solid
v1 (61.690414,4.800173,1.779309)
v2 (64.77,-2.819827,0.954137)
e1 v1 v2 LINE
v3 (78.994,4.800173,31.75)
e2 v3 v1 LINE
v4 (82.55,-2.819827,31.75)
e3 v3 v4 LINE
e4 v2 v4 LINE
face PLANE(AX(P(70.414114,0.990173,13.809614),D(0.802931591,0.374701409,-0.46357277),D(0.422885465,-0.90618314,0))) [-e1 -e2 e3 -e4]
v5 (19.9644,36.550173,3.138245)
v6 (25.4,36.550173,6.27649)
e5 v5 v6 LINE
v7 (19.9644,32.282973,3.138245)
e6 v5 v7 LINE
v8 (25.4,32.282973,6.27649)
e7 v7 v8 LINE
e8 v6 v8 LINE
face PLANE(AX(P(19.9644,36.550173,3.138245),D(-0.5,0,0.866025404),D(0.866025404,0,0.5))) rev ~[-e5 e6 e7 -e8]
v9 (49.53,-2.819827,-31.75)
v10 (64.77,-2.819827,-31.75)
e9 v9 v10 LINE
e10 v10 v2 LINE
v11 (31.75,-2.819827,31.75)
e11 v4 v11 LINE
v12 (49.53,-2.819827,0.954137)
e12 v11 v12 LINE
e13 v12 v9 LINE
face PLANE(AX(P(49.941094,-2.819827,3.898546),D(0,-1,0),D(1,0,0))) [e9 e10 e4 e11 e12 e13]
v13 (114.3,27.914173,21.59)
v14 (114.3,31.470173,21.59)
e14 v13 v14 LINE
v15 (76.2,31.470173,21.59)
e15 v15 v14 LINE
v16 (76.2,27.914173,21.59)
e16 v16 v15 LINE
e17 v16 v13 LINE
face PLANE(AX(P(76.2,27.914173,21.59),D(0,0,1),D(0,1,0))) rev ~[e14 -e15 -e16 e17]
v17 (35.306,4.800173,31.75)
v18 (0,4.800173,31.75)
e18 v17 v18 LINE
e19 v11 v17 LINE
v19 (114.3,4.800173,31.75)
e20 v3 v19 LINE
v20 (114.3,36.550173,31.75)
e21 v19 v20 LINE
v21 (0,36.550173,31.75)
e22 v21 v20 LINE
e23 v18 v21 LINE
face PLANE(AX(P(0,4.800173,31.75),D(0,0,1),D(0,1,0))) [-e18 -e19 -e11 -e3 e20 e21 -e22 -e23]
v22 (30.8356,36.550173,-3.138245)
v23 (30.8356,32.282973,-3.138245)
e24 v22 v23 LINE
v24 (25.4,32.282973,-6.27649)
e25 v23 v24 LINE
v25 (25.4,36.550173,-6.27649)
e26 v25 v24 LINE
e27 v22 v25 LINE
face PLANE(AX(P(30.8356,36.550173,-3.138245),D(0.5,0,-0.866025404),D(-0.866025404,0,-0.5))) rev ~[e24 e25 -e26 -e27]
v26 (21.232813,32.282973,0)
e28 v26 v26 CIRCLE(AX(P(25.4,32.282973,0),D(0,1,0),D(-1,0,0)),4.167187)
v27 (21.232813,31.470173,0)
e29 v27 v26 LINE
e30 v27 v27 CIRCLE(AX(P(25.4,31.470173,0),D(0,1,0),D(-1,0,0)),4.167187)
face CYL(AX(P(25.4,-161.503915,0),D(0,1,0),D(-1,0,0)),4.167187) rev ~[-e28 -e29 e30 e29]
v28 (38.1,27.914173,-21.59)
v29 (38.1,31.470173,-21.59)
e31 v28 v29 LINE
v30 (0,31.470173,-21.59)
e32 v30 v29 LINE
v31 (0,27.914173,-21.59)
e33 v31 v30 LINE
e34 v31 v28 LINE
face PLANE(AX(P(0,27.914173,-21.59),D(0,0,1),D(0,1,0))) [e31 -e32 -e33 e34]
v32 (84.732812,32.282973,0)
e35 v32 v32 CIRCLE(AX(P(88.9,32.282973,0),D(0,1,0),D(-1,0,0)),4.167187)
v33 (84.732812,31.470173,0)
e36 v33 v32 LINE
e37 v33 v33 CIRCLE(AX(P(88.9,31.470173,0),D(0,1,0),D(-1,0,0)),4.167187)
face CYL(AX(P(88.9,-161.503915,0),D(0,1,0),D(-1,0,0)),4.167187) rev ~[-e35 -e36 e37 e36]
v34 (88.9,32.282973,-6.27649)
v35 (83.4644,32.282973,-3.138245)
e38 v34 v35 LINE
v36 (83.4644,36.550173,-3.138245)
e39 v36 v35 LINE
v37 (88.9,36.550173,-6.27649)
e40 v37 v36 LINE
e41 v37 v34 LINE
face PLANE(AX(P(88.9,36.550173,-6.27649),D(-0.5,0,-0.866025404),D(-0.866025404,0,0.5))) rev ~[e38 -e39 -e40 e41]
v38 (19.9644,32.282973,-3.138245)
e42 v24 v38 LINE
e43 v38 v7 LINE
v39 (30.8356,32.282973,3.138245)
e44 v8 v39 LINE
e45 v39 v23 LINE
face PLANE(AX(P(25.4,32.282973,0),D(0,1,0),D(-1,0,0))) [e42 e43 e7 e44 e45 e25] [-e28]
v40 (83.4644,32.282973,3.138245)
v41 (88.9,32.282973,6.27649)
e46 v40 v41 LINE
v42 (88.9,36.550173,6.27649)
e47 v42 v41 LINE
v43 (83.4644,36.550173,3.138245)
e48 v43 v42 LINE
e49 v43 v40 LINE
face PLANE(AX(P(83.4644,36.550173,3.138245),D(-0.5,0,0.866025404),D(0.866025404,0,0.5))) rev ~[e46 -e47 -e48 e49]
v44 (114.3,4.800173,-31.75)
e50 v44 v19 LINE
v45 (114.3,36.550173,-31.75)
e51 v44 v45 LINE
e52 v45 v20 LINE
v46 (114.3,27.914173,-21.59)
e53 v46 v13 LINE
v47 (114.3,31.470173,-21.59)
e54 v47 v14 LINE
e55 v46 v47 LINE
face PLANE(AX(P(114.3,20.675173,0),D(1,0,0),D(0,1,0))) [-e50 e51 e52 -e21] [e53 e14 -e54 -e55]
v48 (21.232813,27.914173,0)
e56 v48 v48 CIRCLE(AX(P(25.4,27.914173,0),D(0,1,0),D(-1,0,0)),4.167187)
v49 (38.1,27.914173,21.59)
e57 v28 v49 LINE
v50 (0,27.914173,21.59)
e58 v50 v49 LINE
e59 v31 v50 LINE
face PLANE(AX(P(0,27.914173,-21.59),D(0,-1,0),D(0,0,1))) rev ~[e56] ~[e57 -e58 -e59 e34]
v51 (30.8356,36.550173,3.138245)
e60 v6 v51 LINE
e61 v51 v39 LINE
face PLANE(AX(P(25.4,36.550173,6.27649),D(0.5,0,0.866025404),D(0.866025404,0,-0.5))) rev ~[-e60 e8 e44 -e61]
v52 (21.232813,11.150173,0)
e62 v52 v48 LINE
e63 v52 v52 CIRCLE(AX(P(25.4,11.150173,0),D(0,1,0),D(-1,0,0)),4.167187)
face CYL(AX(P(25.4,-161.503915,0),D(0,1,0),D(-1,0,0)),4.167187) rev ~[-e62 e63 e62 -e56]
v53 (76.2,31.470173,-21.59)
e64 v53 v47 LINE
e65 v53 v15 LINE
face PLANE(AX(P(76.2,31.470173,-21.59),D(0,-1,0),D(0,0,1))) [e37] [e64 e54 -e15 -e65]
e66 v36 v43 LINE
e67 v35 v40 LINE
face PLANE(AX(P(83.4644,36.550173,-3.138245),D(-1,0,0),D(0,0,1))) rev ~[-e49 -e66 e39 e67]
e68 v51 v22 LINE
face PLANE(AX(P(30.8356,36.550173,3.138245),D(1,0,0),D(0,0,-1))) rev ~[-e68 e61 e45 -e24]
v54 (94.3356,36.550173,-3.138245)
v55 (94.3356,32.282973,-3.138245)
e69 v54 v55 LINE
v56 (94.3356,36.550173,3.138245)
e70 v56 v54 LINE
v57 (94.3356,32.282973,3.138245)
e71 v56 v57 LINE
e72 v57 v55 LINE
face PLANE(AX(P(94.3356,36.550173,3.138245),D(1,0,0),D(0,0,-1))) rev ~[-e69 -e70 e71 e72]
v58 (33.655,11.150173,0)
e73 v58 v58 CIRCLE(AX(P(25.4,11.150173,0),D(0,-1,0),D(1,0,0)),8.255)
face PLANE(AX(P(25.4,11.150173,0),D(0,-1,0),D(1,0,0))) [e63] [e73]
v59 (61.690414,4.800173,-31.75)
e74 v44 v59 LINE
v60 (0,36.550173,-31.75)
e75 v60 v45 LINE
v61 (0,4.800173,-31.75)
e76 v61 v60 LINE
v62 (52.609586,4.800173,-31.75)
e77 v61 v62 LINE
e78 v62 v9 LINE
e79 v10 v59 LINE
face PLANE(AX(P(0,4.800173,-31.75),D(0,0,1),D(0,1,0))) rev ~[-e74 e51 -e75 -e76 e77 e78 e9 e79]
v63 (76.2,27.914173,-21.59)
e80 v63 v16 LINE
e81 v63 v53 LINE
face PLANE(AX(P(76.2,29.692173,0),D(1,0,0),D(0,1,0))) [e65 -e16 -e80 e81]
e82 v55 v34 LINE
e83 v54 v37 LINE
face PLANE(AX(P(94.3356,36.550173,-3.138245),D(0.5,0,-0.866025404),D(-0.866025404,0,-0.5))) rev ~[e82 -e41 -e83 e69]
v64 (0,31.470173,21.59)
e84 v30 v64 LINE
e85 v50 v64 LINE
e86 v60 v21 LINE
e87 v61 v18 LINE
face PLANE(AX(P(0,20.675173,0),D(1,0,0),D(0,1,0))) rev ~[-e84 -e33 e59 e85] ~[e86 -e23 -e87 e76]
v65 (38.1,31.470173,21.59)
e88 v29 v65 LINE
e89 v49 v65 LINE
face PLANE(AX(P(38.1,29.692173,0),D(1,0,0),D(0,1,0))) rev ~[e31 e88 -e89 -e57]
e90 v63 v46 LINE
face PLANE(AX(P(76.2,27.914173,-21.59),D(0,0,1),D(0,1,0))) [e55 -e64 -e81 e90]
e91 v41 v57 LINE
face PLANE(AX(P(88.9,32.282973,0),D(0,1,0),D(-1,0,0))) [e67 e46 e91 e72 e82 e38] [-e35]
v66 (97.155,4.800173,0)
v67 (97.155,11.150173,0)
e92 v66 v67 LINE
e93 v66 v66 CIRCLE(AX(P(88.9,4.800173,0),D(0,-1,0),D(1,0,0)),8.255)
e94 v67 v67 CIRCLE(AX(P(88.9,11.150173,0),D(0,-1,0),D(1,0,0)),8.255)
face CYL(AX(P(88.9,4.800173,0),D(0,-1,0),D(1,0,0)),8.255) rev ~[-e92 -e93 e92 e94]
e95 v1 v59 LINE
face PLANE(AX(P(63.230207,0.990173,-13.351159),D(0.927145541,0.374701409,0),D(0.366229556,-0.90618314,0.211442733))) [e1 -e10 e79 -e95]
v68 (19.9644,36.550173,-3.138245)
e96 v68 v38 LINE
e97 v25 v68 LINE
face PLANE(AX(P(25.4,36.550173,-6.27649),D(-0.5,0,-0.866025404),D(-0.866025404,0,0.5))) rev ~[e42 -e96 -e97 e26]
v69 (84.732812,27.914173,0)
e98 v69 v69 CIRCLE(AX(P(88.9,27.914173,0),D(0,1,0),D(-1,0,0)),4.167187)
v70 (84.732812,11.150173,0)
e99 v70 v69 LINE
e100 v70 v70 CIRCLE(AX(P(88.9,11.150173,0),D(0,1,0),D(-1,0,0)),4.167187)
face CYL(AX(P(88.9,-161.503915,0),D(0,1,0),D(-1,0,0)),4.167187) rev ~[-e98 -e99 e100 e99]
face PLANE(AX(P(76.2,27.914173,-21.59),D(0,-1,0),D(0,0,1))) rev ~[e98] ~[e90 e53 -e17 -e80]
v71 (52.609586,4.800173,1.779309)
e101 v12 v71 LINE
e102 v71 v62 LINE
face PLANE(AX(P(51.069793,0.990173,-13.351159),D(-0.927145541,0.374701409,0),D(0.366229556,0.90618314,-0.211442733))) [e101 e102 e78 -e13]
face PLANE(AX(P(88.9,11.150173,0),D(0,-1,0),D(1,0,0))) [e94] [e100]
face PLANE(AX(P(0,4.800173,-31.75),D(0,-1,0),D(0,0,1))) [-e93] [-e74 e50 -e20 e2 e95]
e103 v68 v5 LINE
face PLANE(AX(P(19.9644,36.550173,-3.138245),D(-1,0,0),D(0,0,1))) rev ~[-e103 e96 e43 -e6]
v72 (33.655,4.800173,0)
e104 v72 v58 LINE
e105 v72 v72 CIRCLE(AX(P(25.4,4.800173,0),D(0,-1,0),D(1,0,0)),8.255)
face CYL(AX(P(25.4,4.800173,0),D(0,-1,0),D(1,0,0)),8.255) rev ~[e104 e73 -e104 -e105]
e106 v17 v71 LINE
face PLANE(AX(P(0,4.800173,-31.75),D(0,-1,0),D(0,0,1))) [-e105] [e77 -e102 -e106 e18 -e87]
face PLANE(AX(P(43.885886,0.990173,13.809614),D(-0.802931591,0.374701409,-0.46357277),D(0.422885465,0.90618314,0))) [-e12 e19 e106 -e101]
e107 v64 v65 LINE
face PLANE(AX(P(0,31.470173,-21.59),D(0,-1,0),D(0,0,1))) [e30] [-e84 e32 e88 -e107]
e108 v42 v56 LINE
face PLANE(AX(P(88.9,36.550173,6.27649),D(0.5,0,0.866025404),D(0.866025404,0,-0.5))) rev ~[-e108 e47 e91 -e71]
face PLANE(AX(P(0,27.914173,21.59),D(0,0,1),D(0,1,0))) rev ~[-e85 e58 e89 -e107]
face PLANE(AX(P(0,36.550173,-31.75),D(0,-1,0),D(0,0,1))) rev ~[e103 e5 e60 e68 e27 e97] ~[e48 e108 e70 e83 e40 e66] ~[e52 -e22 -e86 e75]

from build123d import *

# Parameters (mm, degrees)
F0_W      = 31.75
F0_H      = 63.5
F1_DEPTH  = 114.3
F2_DEPTH  = 114.3
F4_D      = 8.334375
F4_2_D    = 8.334375
F7_DEPTH  = 7.62
F8_W      = 3.556
F8_H      = 43.18
F9_DEPTH  = 38.1
F10_START = 76.2
F10_DEPTH = 38.1
F14_R     = 8.255
F14_R_2   = 4.1671875
F15_R     = 8.255
F15_R_2   = 4.1671875
F16_DEPTH = 6.35
F17_R     = 4.1671875
F18_DEPTH = 4.2672


# Not quite as in the source:
# - a length typed as a fraction of an inch, garbled in the dataset ("3 / 203.2 mm" for 3/8 in), is restored


with BuildPart() as f1:
    # F0 (on Right) → F1 (new body)
    with BuildSketch(Plane.YZ):
        with Locations((20.6751725854, 0)):
            Rectangle(F0_W, F0_H)
    extrude(amount=F1_DEPTH)

    # F4 (through all)
    with Locations(Plane.XZ.offset(26.9498274146)):
        with Locations((25.4, 0), (88.9, 0)):
            Hole(F4_D / 2)

    # F6 (on face) → F7 (join)
    with BuildSketch(Plane.XZ.offset(-4.8001725854)):
        Polygon((57.15, -31.75), (57.15, 31.75), (31.75, 31.75), (49.53, 0.9541366414), (49.53, -31.75), align=None)
        Polygon((82.55, 31.75), (57.15, 31.75), (57.15, -31.75), (64.77, -31.75), (64.77, 0.9541366414), align=None)
    extrude(amount=F7_DEPTH)

    # F8 (on face) → F9 (cut)
    with BuildSketch(Plane.YZ):
        with Locations((29.6921725854, 0)):
            Rectangle(F8_W, F8_H)
    extrude(amount=F9_DEPTH, mode=Mode.SUBTRACT)

    # F8 (on face) → F10 (cut)
    with BuildSketch(Plane.YZ.offset(F10_START)):
        with Locations((29.6921725854, 0)):
            Rectangle(F8_W, F8_H)
    extrude(amount=F10_DEPTH, mode=Mode.SUBTRACT)

    # F12: sweep along a path in F12_path
    with BuildLine(Plane(origin=(31.75, -2.8198274146, 31.75), x_dir=(0, 0, 1), z_dir=(0, -1, 0))) as f12_path:
        Line((0, 0), (-30.7958633586, -17.78))
        Line((-30.7958633586, -17.78), (-63.5, -17.78))
    # F11 (on face) → F12 (sweep, cut)
    with BuildSketch(Plane.XY.offset(31.75)):
        Polygon((35.306, 4.8001725854), (31.75, 4.8001725854), (31.75, -2.8198274146), align=None)
    sweep(path=f12_path.line, transition=Transition.RIGHT, mode=Mode.SUBTRACT)

    # F13: sweep along a path in F13_path
    with BuildLine(Plane(origin=(82.55, -2.8198274146, 31.75), x_dir=(0, 0, -1), z_dir=(0, 1, 0))) as f13_path:
        Line((0, 0), (30.7958633586, 17.78))
        Line((30.7958633586, 17.78), (63.5, 17.78))
    # F11 (on face) → F13 (sweep, cut)
    with BuildSketch(Plane.XY.offset(31.75)):
        Polygon((78.994, 4.8001725854), (82.55, -2.8198274146), (82.55, 4.8001725854), align=None)
    sweep(path=f13_path.line, transition=Transition.RIGHT, mode=Mode.SUBTRACT)

    # F14 (on face) + F15 (on face) → F16 (cut)
    with BuildSketch(Plane.XZ.offset(-4.8001725854)):
        with Locations((25.4, 0)):
            Circle(F14_R)
        with Locations((25.4, 0)):
            Circle(F14_R_2, mode=Mode.SUBTRACT)
    with BuildSketch(Plane.XZ.offset(-4.8001725854)):
        with Locations((88.9, 0)):
            Circle(F15_R)
        with Locations((88.9, 0)):
            Circle(F15_R_2, mode=Mode.SUBTRACT)
    extrude(amount=-F16_DEPTH, mode=Mode.SUBTRACT)

    # F17 (on face) → F18 (cut)
    with BuildSketch(Plane(origin=(0, 36.5501725854, 0), x_dir=(-1, 0, 0), z_dir=(0, 1, 0))):
        Polygon((-83.4644, -3.1382451232), (-83.4644, 3.1382451232), (-88.9, 6.2764902464), (-94.3356, 3.1382451232), (-94.3356, -3.1382451232), (-88.9, -6.2764902464), align=None)
        with Locations((-88.9, 0)):
            Circle(F17_R, mode=Mode.SUBTRACT)
        Polygon((-30.8356, 3.1382451232), (-30.8356, -3.1382451232), (-25.4, -6.2764902464), (-19.9644, -3.1382451232), (-19.9644, 3.1382451232), (-25.4, 6.2764902464), align=None)
        with Locations((-25.4, 0)):
            Circle(F17_R, mode=Mode.SUBTRACT)
    extrude(amount=-F18_DEPTH, mode=Mode.SUBTRACT)


with BuildPart() as f2:
    # F0 (on Right) → F2 (new body)
    with BuildSketch(Plane.YZ):
        Polygon((-26.9498274146, -19.685), (-26.9498274146, -31.75), (4.8001725854, -31.75), (4.8001725854, 31.75), (-26.9498274146, 31.75), (-26.9498274146, 19.685), (-23.3938274146, 19.685), (-7.8998274146, 8.89), (-7.8998274146, -8.89), (-23.3938274146, -19.685), align=None)
        Polygon((-26.9498274146, 19.685), (-26.9498274146, -19.685), (-23.3938274146, -19.685), (-7.8998274146, -8.89), (-7.8998274146, 8.89), (-23.3938274146, 19.685), align=None)
    extrude(amount=F2_DEPTH)

    # F4#2 (through all)
    with Locations(Plane.XZ.offset(26.9498274146)):
        with Locations((25.4, 0), (88.9, 0)):
            Hole(F4_2_D / 2)


solid = f1.part
